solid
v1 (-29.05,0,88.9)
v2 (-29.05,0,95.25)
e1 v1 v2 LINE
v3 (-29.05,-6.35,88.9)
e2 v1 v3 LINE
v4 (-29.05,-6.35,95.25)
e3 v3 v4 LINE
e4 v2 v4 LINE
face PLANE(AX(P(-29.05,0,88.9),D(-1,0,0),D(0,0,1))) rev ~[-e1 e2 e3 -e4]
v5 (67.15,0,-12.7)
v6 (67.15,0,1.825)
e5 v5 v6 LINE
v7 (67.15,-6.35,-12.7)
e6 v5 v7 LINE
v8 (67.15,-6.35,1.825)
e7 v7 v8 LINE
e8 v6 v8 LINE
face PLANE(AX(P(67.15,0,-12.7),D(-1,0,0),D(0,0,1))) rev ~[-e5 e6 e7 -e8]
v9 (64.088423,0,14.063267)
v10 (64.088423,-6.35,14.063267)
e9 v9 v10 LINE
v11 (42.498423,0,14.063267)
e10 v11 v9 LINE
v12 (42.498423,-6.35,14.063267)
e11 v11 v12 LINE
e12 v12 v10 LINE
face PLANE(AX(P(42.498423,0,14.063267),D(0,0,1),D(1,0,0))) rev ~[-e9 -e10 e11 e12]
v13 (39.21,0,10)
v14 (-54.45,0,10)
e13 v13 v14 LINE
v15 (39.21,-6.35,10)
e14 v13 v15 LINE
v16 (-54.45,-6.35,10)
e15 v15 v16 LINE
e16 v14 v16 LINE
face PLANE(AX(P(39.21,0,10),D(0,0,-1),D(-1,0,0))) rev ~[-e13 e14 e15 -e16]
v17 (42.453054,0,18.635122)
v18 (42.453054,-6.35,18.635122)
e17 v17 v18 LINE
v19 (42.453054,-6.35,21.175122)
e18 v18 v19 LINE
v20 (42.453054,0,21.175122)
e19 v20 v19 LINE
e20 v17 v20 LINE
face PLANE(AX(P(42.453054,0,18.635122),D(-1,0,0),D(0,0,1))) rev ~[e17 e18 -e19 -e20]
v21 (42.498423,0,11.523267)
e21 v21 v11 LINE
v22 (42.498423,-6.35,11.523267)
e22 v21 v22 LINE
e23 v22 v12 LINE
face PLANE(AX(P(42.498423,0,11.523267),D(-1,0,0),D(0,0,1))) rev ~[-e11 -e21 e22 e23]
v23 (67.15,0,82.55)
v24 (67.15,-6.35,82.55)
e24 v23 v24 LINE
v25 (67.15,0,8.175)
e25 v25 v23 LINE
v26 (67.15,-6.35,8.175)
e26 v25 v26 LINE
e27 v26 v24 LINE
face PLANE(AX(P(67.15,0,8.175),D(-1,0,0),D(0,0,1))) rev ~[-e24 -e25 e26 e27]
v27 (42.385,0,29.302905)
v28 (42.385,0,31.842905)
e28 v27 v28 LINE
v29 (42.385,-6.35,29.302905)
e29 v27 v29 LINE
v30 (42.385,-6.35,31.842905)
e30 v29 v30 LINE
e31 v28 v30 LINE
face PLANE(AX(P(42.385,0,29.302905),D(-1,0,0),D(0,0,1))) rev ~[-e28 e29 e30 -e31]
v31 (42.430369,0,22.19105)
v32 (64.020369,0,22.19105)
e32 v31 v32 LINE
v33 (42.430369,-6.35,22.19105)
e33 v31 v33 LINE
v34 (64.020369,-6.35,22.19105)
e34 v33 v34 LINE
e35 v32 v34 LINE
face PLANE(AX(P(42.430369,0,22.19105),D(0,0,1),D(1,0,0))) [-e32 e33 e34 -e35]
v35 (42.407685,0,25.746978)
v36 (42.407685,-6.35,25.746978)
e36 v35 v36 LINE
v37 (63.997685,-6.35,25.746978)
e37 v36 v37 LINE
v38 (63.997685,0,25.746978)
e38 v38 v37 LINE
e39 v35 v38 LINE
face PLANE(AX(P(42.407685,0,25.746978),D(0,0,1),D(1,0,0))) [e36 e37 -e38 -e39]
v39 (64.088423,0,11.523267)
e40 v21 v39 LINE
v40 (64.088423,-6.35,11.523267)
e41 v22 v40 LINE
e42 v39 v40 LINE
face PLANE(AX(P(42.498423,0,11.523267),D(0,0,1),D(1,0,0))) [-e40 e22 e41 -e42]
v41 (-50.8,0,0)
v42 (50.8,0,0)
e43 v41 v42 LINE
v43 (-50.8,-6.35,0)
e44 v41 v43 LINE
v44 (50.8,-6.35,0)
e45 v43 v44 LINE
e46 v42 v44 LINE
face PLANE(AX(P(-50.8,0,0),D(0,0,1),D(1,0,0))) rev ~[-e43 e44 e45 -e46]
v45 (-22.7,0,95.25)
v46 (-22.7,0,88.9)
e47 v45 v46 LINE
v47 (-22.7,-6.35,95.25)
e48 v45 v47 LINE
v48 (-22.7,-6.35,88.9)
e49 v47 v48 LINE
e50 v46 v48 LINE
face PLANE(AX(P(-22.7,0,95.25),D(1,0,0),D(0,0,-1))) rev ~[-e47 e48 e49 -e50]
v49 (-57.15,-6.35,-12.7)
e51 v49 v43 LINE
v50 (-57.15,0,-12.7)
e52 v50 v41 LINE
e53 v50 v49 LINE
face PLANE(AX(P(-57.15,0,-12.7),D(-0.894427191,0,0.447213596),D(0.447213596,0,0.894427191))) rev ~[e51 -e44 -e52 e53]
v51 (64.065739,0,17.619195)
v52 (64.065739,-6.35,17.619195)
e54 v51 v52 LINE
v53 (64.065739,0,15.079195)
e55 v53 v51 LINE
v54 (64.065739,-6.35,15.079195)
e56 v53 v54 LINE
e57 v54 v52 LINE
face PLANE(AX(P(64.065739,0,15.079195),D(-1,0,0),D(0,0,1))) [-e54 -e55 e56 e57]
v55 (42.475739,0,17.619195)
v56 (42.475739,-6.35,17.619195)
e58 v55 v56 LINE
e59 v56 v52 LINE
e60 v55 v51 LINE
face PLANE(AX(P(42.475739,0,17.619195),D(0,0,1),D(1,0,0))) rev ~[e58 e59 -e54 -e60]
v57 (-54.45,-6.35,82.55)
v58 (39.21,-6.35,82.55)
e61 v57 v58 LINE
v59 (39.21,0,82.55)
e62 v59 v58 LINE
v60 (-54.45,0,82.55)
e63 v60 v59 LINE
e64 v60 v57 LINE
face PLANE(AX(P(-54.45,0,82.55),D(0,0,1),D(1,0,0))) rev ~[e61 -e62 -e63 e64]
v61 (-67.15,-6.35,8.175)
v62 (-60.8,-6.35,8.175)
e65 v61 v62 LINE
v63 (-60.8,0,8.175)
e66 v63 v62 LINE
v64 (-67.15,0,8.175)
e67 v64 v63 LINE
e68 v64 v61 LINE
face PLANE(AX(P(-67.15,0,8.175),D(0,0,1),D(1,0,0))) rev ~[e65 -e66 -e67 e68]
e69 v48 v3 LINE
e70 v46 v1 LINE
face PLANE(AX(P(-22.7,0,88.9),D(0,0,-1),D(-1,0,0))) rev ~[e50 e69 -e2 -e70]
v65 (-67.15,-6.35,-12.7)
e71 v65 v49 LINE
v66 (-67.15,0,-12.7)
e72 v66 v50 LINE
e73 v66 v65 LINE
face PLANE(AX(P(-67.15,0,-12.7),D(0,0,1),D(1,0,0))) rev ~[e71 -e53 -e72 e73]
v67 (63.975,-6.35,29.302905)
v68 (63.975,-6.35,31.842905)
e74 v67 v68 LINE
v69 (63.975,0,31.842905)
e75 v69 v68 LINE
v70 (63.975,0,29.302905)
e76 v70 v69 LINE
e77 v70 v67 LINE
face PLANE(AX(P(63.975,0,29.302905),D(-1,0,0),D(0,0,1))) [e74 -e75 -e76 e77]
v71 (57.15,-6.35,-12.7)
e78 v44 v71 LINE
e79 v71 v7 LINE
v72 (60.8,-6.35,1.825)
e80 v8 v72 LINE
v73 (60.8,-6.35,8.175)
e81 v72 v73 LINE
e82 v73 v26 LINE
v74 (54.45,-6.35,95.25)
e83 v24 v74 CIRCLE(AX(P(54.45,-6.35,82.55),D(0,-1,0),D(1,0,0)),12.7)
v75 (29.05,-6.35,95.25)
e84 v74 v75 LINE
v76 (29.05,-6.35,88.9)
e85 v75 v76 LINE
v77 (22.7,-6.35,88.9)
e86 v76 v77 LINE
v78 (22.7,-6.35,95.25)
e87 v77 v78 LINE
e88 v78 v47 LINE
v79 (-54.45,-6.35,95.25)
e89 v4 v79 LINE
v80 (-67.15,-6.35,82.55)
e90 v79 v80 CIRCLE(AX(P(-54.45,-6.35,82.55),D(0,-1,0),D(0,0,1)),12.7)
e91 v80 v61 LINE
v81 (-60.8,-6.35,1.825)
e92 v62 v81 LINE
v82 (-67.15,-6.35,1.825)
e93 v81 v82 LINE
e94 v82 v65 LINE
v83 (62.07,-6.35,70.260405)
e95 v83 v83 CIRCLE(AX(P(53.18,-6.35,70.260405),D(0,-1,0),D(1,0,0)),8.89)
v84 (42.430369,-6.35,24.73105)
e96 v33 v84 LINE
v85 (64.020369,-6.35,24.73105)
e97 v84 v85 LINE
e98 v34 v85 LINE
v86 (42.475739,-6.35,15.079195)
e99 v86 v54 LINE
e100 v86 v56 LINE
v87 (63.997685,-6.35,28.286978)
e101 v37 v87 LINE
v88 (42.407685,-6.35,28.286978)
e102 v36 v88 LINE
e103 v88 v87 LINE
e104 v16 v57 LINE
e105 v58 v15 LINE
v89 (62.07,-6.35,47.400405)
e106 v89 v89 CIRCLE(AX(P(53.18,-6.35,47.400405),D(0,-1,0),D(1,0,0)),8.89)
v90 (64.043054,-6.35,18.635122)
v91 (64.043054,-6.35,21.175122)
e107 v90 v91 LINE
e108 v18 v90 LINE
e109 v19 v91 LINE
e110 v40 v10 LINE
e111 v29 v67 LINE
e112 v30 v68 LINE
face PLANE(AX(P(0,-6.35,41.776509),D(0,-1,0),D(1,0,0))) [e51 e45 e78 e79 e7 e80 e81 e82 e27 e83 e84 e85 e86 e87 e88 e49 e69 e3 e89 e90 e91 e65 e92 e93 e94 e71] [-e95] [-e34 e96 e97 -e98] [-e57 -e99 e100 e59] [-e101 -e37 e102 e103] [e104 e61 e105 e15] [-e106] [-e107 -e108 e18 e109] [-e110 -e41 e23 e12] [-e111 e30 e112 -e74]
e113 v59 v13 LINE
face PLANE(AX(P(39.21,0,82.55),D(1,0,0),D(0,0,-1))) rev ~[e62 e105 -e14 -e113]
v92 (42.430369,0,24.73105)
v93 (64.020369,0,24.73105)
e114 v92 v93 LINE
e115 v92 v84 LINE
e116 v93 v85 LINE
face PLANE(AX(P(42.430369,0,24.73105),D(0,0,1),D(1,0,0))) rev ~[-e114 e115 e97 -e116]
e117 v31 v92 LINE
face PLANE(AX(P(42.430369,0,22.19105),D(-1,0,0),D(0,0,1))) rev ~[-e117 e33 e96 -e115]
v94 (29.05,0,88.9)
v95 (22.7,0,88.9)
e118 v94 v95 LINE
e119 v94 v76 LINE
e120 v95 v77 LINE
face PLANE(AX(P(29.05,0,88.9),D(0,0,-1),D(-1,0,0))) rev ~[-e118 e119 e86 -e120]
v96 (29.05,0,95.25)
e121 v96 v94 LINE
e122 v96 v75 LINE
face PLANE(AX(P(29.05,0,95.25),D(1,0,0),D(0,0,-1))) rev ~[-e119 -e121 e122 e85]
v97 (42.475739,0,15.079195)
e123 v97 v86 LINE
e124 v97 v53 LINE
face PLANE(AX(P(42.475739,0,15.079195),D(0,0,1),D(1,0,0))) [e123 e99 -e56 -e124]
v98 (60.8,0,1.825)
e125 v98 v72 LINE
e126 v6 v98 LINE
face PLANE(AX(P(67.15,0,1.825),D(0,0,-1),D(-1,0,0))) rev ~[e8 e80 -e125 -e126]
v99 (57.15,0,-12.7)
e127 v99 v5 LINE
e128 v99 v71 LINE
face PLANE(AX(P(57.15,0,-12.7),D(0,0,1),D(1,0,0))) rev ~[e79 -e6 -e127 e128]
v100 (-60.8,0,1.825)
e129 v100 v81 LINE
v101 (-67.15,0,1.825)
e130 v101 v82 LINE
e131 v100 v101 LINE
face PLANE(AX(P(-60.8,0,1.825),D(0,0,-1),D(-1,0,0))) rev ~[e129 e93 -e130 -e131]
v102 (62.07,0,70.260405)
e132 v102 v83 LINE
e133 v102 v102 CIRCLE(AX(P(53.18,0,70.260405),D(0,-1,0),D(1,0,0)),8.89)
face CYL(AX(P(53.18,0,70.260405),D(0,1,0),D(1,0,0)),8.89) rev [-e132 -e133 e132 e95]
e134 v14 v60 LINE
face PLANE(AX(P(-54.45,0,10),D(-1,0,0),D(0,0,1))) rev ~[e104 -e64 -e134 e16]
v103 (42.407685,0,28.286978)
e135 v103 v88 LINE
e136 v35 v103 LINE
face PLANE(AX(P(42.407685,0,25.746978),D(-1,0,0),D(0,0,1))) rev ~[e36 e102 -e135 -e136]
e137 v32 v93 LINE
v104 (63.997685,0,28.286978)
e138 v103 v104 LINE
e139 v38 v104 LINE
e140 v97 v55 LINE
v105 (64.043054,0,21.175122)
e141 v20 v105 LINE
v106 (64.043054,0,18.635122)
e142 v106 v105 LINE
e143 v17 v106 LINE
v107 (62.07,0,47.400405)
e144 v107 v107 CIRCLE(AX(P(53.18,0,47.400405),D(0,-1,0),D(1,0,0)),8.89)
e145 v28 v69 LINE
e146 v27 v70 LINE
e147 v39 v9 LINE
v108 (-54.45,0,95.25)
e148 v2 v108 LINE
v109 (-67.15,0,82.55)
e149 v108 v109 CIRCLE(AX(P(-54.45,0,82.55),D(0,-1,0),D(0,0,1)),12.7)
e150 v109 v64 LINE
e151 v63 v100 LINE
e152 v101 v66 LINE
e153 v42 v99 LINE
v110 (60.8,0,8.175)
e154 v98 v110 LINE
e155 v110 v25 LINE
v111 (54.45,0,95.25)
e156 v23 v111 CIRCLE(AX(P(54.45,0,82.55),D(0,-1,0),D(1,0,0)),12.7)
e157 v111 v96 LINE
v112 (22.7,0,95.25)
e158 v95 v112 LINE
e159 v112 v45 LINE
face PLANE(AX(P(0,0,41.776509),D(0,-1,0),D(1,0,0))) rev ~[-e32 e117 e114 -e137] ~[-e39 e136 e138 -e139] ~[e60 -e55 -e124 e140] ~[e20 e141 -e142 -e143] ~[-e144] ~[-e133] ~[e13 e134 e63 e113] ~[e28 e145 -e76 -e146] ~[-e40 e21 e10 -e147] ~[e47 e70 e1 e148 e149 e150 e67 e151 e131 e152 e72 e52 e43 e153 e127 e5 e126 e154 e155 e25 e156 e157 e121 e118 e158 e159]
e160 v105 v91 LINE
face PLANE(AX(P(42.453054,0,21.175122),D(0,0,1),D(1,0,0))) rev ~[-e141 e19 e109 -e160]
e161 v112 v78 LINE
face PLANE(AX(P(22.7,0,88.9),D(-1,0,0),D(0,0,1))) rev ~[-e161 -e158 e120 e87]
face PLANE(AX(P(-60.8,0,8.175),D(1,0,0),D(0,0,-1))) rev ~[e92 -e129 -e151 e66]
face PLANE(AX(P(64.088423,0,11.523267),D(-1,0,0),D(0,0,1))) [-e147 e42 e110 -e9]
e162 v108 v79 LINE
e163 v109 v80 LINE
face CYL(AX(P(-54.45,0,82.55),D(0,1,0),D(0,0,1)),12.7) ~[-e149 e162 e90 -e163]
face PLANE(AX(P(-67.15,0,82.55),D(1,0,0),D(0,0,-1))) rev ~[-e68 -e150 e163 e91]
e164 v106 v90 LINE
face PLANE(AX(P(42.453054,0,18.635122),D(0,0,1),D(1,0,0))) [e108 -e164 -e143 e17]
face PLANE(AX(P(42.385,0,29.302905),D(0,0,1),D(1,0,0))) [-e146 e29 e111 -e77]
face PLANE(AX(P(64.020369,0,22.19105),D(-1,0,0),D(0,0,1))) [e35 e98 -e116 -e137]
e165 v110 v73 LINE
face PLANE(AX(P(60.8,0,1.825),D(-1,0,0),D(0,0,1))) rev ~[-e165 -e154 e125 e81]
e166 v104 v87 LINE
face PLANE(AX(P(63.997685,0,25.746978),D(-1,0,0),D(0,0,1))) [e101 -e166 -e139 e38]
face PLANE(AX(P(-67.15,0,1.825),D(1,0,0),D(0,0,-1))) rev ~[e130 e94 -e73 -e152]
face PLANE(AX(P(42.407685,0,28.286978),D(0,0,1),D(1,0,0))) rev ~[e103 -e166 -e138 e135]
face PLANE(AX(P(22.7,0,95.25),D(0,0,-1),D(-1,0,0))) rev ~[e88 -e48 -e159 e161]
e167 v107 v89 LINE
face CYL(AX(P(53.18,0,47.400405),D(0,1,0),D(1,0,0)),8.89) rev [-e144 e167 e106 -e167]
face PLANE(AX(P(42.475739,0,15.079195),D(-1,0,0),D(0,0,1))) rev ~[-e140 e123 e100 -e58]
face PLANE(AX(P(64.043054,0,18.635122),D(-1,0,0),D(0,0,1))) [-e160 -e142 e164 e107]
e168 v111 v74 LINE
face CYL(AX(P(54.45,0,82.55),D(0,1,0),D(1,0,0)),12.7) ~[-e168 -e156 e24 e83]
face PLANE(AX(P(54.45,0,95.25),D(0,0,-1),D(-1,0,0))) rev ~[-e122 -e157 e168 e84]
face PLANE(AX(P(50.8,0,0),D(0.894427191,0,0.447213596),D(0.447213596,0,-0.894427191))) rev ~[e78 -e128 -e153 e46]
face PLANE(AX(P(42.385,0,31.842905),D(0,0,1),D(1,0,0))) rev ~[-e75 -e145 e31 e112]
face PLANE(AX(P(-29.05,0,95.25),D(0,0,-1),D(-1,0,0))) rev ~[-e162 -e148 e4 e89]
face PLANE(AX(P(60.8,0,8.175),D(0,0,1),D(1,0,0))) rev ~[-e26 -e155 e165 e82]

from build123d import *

# Parameters (mm, degrees)
F1_W     = 21.59
F1_H     = 2.54
F1_R     = 8.89
F2_DEPTH = 6.35


# Not quite as in the source:
# - a variable given as a bare number and used for a length is read in inches; the dataset says mm whatever the document's units were


with BuildPart() as f2:
    # F1 (on Front) → F2 (new body)
    with BuildSketch(Plane.XZ):
        with BuildLine():
            Line((-50.8, 0), (0, 0))
            Line((0, 0), (50.8, 0))
            Line((50.8, 0), (57.15, -12.7))
            Line((57.15, -12.7), (67.15, -12.7))
            Line((67.15, -12.7), (67.15, 1.825))
            Line((67.15, 1.825), (60.8, 1.825))
            Line((60.8, 1.825), (60.8, 8.175))
            Line((60.8, 8.175), (67.15, 8.175))
            Line((67.15, 8.175), (67.15, 82.55))
            ThreePointArc((67.15, 82.55), (63.4302561211, 91.5302561211), (54.45, 95.25))
            Line((54.45, 95.25), (48.1170043349, 95.25))
            Line((48.1170043349, 95.25), (29.05, 95.25))
            Line((29.05, 95.25), (29.05, 88.9))
            Line((29.05, 88.9), (22.7, 88.9))
            Line((22.7, 88.9), (22.7, 95.25))
            Line((22.7, 95.25), (0, 95.25))
            Line((0, 95.25), (-22.7, 95.25))
            Line((-22.7, 95.25), (-22.7, 88.9))
            Line((-22.7, 88.9), (-29.05, 88.9))
            Line((-29.05, 88.9), (-29.05, 95.25))
            Line((-29.05, 95.25), (-48.1170043349, 95.25))
            Line((-48.1170043349, 95.25), (-54.45, 95.25))
            ThreePointArc((-54.45, 95.25), (-63.4302561211, 91.5302561211), (-67.15, 82.55))
            Line((-67.15, 82.55), (-67.15, 70.6480368972))
            Line((-67.15, 70.6480368972), (-67.15, 8.175))
            Line((-67.15, 8.175), (-60.8, 8.175))
            Line((-60.8, 8.175), (-60.8, 1.825))
            Line((-60.8, 1.825), (-67.15, 1.825))
            Line((-67.15, 1.825), (-67.15, -12.7))
            Line((-67.15, -12.7), (-57.15, -12.7))
            Line((-57.15, -12.7), (-50.8, 0))
        make_face()
        with Locations((53.2934233144, 12.7932670589)):
            Rectangle(F1_W, F1_H, mode=Mode.SUBTRACT)
        with Locations((53.2707386515, 16.3491947024)):
            Rectangle(F1_W, F1_H, mode=Mode.SUBTRACT)
        with Locations((53.2480539886, 19.9051223459)):
            Rectangle(F1_W, F1_H, mode=Mode.SUBTRACT)
        with Locations((53.2253693257, 23.4610499895)):
            Rectangle(F1_W, F1_H, mode=Mode.SUBTRACT)
        with Locations((53.2026846629, 27.016977633)):
            Rectangle(F1_W, F1_H, mode=Mode.SUBTRACT)
        with Locations((53.18, 30.5729052765)):
            Rectangle(F1_W, F1_H, mode=Mode.SUBTRACT)
        Polygon((-54.45, 10), (-54.45, 82.55), (0, 82.55), (39.21, 82.55), (39.21, 10), (0, 10), align=None, mode=Mode.SUBTRACT)
        with Locations((53.18, 47.4004052765)):
            Circle(F1_R, mode=Mode.SUBTRACT)
        with Locations((53.18, 70.2604052765)):
            Circle(F1_R, mode=Mode.SUBTRACT)
    extrude(amount=F2_DEPTH)


solid = f2.part
